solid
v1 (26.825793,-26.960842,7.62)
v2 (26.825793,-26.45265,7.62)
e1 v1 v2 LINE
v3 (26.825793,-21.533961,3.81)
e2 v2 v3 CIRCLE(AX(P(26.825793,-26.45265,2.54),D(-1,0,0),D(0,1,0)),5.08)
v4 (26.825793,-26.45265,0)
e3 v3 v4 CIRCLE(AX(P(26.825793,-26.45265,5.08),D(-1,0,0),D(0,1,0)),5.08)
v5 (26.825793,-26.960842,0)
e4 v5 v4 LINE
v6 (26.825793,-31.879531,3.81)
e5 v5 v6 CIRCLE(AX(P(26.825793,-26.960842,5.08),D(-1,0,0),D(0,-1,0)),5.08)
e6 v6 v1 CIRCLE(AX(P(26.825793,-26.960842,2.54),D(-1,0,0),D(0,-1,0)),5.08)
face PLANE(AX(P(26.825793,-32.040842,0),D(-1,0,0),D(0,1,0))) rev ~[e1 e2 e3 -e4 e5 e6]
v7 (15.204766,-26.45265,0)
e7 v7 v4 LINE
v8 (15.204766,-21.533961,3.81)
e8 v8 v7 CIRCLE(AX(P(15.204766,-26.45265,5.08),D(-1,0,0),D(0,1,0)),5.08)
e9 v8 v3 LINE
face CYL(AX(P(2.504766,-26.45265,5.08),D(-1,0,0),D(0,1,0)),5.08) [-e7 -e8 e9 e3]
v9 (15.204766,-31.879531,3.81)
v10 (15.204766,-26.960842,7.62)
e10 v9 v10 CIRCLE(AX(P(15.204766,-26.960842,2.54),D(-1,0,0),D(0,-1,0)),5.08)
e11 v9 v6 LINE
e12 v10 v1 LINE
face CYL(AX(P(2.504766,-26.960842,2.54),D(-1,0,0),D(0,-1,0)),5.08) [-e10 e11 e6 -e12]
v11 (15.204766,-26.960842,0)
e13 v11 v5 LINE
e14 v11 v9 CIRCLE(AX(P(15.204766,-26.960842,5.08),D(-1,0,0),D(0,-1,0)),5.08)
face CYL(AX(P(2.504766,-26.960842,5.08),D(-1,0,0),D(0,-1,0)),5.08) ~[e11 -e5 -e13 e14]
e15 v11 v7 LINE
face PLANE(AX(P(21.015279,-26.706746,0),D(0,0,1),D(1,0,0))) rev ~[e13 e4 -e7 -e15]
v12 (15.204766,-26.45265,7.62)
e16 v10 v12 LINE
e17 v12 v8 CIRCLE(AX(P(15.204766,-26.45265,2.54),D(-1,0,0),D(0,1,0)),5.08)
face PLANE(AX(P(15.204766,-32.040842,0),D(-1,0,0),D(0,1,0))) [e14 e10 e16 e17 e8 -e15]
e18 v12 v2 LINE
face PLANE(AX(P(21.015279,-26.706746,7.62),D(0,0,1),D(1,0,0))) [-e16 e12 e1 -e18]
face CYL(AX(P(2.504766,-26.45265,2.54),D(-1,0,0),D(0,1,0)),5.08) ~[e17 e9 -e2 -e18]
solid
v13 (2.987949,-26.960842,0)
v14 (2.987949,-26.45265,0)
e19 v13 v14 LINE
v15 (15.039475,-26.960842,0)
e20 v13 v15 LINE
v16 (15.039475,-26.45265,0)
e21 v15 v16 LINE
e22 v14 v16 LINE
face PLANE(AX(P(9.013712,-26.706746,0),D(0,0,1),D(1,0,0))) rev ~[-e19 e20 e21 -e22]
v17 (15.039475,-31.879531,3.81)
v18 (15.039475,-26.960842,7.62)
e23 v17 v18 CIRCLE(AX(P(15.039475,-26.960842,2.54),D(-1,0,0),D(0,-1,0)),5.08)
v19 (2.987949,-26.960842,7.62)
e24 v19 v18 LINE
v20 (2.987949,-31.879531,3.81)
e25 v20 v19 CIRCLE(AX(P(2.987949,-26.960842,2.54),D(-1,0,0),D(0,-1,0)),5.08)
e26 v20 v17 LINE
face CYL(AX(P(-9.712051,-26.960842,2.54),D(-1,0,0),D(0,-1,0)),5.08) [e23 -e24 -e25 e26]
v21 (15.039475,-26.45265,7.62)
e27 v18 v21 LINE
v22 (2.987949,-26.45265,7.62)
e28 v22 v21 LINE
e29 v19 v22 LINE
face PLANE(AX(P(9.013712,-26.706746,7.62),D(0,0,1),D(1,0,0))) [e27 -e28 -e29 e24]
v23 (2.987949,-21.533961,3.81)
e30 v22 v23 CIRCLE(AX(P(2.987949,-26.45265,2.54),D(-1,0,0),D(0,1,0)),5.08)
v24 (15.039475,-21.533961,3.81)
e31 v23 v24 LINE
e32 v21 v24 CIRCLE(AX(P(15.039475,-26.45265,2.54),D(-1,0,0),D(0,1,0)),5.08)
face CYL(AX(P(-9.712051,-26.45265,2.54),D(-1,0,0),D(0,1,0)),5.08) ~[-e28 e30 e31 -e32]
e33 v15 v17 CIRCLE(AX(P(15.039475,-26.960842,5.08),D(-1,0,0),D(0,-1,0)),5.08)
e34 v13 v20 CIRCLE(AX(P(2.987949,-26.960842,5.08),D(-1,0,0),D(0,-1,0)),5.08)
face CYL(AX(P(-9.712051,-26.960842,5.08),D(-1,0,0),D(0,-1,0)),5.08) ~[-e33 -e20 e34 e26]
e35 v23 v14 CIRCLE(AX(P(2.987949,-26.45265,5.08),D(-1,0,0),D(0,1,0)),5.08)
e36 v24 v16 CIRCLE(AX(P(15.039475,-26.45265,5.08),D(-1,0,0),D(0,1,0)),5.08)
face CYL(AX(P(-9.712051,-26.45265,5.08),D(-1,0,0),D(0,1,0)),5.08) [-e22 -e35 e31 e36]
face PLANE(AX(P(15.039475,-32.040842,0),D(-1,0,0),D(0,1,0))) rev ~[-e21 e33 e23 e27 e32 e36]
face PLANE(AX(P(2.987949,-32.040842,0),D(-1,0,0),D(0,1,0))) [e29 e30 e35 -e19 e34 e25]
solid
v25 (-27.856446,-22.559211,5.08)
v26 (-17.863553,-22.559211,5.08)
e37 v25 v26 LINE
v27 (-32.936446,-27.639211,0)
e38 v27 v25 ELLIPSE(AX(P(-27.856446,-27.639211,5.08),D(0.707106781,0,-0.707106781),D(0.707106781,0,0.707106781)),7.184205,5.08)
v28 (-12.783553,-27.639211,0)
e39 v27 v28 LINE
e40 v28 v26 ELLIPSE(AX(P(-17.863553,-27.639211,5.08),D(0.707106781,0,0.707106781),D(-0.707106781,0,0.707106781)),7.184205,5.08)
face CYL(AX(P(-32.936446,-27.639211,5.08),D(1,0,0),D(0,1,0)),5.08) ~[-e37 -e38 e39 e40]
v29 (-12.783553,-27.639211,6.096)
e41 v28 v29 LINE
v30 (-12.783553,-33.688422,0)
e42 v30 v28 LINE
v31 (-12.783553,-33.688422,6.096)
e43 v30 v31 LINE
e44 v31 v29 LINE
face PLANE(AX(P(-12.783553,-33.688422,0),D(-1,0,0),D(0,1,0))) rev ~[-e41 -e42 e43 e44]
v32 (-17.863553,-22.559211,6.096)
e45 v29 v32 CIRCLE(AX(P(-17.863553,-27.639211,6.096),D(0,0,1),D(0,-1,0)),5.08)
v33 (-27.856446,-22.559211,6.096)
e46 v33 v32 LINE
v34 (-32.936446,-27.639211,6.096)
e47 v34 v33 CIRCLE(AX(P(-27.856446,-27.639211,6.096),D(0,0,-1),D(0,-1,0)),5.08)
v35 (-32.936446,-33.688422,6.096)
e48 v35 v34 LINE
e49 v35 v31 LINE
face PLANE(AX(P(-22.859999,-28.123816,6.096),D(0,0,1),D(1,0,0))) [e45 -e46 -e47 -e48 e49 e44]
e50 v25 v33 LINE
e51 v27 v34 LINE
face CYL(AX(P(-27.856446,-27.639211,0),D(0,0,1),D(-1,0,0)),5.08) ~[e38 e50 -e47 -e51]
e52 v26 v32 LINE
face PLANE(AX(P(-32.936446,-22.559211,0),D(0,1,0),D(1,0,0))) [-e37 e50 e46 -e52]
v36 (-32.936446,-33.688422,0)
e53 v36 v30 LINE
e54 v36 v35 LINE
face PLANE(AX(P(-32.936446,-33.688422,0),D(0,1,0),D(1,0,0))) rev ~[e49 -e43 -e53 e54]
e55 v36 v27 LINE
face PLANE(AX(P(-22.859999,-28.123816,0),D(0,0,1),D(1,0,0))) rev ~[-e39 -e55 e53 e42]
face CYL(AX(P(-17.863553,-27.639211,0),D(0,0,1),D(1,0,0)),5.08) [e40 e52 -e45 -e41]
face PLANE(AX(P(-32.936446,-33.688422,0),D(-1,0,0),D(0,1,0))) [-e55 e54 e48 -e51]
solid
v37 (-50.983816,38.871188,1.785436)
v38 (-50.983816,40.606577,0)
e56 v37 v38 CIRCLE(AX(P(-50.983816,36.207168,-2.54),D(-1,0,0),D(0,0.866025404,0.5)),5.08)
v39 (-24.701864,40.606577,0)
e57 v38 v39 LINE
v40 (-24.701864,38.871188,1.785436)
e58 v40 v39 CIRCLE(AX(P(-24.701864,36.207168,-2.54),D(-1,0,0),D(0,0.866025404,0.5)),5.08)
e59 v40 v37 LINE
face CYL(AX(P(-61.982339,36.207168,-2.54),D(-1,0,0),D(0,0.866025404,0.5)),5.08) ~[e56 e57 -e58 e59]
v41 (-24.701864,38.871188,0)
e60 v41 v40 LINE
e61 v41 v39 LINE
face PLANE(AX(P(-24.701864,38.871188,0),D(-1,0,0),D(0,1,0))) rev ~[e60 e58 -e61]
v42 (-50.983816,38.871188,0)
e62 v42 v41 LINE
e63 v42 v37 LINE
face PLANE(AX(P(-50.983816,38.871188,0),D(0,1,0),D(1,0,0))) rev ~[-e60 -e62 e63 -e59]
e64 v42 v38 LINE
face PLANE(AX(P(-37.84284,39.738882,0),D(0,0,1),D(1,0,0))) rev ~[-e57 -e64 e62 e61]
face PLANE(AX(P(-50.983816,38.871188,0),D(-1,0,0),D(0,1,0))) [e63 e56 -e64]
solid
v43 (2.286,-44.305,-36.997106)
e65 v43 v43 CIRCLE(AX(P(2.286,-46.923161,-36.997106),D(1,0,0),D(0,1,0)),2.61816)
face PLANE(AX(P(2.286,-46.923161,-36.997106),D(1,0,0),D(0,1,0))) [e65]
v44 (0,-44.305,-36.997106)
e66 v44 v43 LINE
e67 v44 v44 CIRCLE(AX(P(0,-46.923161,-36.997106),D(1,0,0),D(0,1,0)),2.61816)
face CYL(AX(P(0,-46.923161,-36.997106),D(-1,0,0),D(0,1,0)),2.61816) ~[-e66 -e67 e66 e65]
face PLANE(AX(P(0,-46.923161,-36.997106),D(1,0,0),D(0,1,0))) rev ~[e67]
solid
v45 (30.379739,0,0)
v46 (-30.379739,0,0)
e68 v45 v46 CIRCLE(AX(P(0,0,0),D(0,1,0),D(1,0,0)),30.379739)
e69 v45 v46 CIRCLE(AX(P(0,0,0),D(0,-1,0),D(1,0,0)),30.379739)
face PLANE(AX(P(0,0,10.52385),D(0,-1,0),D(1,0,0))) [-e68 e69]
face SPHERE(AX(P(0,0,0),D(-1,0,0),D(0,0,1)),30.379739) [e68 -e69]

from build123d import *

# Parameters (mm, degrees)
F1_ANGLE      = 180
F2_W          = 11.6210272536
F2_H          = 10.6681920588
F3_DEPTH      = 7.62
F2_W_2        = 12.0515259914
F4_T1_DEPTH   = 37.0210272536
F4_2_T1_DEPTH = 37.4515259914
F5_R          = 2.6181603729
F6_DEPTH      = 2.286
F7_W          = 20.1528938487
F7_H          = 11.1292116344
F8_DEPTH      = 6.096
F9_R          = 5.08
F10_W         = 26.281952858
F10_H         = 1.7353892326
F11_DEPTH     = 2.54
F12_T1_DEPTH  = 48.2789981141


# Not quite as in the source:
# - a fillet or chamfer that OpenCascade refuses, or shapes differently, is made with other operations: its cross-section is extruded or revolved along the edge and cut away or added


with BuildPart() as f1:
    # F0 (on Front) → F1 (revolve)
    with BuildSketch(Plane.XZ):
        with BuildLine():
            Line((0, 0), (30.3797386587, 0))
            ThreePointArc((30.3797386587, 0), (0, 30.3797386587), (-30.3797386587, 0))
            Line((-30.3797386587, 0), (0, 0))
        make_face()
    revolve(axis=Axis((0, 0, 0), (-1, 0, 0)), revolution_arc=F1_ANGLE)


with BuildPart() as f3:
    # F2 (on Top) → F3 (new body)
    with BuildSketch(Plane.XY):
        with Locations((21.0152794607, -26.7067458481)):
            Rectangle(F2_W, F2_H)
    extrude(amount=F3_DEPTH)

    # F4: fillet of radius 5.08 on 4 edges, made by hand

    # F4_s2 → F4_t1 (cut)
    with BuildSketch(Plane.YZ.offset(2.5047658339)):
        with BuildLine():
            ThreePointArc((-21.3726498187, 5.08), (-22.8605473702, 1.4878975516), (-26.4526498187, 0))
            Line((-26.4526498187, 0), (-21.3726498187, 0))
            Line((-21.3726498187, 0), (-21.3726498187, 5.08))
        make_face()
        with BuildLine():
            ThreePointArc((-32.0408418775, 5.08), (-30.5529443259, 1.4878975516), (-26.9608418775, 0))
            Line((-26.9608418775, 0), (-32.0408418775, 0))
            Line((-32.0408418775, 0), (-32.0408418775, 5.08))
        make_face()
        with BuildLine():
            ThreePointArc((-32.0408418775, 2.54), (-30.5529443259, 6.1321024484), (-26.9608418775, 7.62))
            Line((-26.9608418775, 7.62), (-32.0408418775, 7.62))
            Line((-32.0408418775, 7.62), (-32.0408418775, 2.54))
        make_face()
        with BuildLine():
            ThreePointArc((-21.3726498187, 2.54), (-22.8605473702, 6.1321024484), (-26.4526498187, 7.62))
            Line((-26.4526498187, 7.62), (-21.3726498187, 7.62))
            Line((-21.3726498187, 7.62), (-21.3726498187, 2.54))
        make_face()
    extrude(amount=F4_T1_DEPTH, mode=Mode.SUBTRACT)


with BuildPart() as f3b:
    # F2 (on Top) → F3, piece 2 (new body)
    with BuildSketch(Plane.XY):
        with Locations((9.0137117077, -26.7067458481)):
            Rectangle(F2_W_2, F2_H)
    extrude(amount=F3_DEPTH)

    # F4#2: fillet of radius 5.08 on 4 edges, made by hand

    # F4_2_s2 → F4_2_t1 (cut)
    with BuildSketch(Plane.YZ.offset(-9.712051288)):
        with BuildLine():
            ThreePointArc((-21.3726498187, 5.08), (-22.8605473702, 1.4878975516), (-26.4526498187, 0))
            Line((-26.4526498187, 0), (-21.3726498187, 0))
            Line((-21.3726498187, 0), (-21.3726498187, 5.08))
        make_face()
        with BuildLine():
            ThreePointArc((-32.0408418775, 5.08), (-30.5529443259, 1.4878975516), (-26.9608418775, 0))
            Line((-26.9608418775, 0), (-32.0408418775, 0))
            Line((-32.0408418775, 0), (-32.0408418775, 5.08))
        make_face()
        with BuildLine():
            ThreePointArc((-32.0408418775, 2.54), (-30.5529443259, 6.1321024484), (-26.9608418775, 7.62))
            Line((-26.9608418775, 7.62), (-32.0408418775, 7.62))
            Line((-32.0408418775, 7.62), (-32.0408418775, 2.54))
        make_face()
        with BuildLine():
            ThreePointArc((-21.3726498187, 2.54), (-22.8605473702, 6.1321024484), (-26.4526498187, 7.62))
            Line((-26.4526498187, 7.62), (-21.3726498187, 7.62))
            Line((-21.3726498187, 7.62), (-21.3726498187, 2.54))
        make_face()
    extrude(amount=F4_2_T1_DEPTH, mode=Mode.SUBTRACT)


with BuildPart() as f6:
    # F5 (on Right) → F6 (new body)
    with BuildSketch(Plane.YZ):
        with Locations((-46.923160553, -36.9971059263)):
            Circle(F5_R)
    extrude(amount=F6_DEPTH)


with BuildPart() as f8:
    # F7 (on Top) → F8 (new body)
    with BuildSketch(Plane.XY):
        with Locations((-22.8599994443, -28.1238164753)):
            Rectangle(F7_W, F7_H)
    extrude(amount=F8_DEPTH)

    # F9
    f9_edges = [f8.edges().sort_by_distance(p)[0] for p in [
        (-12.783553, -22.559211, 3.048),
        (-32.936446, -22.559211, 3.048),
        (-22.859999, -22.559211, 0),
    ]]
    fillet(f9_edges, radius=F9_R)


with BuildPart() as f11:
    # F10 (on Top) → F11 (new body)
    with BuildSketch(Plane.XY):
        with Locations((-37.8428399563, 39.738882333)):
            Rectangle(F10_W, F10_H)
    extrude(amount=F11_DEPTH)

    # F12: fillet of radius 5.08 on 1 edges, made by hand

    # F12_s2 → F12_t1 (cut)
    with BuildSketch(Plane.YZ.offset(-61.9823390133)):
        with BuildLine():
            ThreePointArc((40.6065769494, 0), (38.7471678981, 1.8594090512), (36.2071678981, 2.54))
            Line((36.2071678981, 2.54), (40.6065769494, 2.54))
            Line((40.6065769494, 2.54), (40.6065769494, 0))
        make_face()
    extrude(amount=F12_T1_DEPTH, mode=Mode.SUBTRACT)


solid = Compound([f1.part, f3.part, f3b.part, f6.part, f8.part, f11.part])
